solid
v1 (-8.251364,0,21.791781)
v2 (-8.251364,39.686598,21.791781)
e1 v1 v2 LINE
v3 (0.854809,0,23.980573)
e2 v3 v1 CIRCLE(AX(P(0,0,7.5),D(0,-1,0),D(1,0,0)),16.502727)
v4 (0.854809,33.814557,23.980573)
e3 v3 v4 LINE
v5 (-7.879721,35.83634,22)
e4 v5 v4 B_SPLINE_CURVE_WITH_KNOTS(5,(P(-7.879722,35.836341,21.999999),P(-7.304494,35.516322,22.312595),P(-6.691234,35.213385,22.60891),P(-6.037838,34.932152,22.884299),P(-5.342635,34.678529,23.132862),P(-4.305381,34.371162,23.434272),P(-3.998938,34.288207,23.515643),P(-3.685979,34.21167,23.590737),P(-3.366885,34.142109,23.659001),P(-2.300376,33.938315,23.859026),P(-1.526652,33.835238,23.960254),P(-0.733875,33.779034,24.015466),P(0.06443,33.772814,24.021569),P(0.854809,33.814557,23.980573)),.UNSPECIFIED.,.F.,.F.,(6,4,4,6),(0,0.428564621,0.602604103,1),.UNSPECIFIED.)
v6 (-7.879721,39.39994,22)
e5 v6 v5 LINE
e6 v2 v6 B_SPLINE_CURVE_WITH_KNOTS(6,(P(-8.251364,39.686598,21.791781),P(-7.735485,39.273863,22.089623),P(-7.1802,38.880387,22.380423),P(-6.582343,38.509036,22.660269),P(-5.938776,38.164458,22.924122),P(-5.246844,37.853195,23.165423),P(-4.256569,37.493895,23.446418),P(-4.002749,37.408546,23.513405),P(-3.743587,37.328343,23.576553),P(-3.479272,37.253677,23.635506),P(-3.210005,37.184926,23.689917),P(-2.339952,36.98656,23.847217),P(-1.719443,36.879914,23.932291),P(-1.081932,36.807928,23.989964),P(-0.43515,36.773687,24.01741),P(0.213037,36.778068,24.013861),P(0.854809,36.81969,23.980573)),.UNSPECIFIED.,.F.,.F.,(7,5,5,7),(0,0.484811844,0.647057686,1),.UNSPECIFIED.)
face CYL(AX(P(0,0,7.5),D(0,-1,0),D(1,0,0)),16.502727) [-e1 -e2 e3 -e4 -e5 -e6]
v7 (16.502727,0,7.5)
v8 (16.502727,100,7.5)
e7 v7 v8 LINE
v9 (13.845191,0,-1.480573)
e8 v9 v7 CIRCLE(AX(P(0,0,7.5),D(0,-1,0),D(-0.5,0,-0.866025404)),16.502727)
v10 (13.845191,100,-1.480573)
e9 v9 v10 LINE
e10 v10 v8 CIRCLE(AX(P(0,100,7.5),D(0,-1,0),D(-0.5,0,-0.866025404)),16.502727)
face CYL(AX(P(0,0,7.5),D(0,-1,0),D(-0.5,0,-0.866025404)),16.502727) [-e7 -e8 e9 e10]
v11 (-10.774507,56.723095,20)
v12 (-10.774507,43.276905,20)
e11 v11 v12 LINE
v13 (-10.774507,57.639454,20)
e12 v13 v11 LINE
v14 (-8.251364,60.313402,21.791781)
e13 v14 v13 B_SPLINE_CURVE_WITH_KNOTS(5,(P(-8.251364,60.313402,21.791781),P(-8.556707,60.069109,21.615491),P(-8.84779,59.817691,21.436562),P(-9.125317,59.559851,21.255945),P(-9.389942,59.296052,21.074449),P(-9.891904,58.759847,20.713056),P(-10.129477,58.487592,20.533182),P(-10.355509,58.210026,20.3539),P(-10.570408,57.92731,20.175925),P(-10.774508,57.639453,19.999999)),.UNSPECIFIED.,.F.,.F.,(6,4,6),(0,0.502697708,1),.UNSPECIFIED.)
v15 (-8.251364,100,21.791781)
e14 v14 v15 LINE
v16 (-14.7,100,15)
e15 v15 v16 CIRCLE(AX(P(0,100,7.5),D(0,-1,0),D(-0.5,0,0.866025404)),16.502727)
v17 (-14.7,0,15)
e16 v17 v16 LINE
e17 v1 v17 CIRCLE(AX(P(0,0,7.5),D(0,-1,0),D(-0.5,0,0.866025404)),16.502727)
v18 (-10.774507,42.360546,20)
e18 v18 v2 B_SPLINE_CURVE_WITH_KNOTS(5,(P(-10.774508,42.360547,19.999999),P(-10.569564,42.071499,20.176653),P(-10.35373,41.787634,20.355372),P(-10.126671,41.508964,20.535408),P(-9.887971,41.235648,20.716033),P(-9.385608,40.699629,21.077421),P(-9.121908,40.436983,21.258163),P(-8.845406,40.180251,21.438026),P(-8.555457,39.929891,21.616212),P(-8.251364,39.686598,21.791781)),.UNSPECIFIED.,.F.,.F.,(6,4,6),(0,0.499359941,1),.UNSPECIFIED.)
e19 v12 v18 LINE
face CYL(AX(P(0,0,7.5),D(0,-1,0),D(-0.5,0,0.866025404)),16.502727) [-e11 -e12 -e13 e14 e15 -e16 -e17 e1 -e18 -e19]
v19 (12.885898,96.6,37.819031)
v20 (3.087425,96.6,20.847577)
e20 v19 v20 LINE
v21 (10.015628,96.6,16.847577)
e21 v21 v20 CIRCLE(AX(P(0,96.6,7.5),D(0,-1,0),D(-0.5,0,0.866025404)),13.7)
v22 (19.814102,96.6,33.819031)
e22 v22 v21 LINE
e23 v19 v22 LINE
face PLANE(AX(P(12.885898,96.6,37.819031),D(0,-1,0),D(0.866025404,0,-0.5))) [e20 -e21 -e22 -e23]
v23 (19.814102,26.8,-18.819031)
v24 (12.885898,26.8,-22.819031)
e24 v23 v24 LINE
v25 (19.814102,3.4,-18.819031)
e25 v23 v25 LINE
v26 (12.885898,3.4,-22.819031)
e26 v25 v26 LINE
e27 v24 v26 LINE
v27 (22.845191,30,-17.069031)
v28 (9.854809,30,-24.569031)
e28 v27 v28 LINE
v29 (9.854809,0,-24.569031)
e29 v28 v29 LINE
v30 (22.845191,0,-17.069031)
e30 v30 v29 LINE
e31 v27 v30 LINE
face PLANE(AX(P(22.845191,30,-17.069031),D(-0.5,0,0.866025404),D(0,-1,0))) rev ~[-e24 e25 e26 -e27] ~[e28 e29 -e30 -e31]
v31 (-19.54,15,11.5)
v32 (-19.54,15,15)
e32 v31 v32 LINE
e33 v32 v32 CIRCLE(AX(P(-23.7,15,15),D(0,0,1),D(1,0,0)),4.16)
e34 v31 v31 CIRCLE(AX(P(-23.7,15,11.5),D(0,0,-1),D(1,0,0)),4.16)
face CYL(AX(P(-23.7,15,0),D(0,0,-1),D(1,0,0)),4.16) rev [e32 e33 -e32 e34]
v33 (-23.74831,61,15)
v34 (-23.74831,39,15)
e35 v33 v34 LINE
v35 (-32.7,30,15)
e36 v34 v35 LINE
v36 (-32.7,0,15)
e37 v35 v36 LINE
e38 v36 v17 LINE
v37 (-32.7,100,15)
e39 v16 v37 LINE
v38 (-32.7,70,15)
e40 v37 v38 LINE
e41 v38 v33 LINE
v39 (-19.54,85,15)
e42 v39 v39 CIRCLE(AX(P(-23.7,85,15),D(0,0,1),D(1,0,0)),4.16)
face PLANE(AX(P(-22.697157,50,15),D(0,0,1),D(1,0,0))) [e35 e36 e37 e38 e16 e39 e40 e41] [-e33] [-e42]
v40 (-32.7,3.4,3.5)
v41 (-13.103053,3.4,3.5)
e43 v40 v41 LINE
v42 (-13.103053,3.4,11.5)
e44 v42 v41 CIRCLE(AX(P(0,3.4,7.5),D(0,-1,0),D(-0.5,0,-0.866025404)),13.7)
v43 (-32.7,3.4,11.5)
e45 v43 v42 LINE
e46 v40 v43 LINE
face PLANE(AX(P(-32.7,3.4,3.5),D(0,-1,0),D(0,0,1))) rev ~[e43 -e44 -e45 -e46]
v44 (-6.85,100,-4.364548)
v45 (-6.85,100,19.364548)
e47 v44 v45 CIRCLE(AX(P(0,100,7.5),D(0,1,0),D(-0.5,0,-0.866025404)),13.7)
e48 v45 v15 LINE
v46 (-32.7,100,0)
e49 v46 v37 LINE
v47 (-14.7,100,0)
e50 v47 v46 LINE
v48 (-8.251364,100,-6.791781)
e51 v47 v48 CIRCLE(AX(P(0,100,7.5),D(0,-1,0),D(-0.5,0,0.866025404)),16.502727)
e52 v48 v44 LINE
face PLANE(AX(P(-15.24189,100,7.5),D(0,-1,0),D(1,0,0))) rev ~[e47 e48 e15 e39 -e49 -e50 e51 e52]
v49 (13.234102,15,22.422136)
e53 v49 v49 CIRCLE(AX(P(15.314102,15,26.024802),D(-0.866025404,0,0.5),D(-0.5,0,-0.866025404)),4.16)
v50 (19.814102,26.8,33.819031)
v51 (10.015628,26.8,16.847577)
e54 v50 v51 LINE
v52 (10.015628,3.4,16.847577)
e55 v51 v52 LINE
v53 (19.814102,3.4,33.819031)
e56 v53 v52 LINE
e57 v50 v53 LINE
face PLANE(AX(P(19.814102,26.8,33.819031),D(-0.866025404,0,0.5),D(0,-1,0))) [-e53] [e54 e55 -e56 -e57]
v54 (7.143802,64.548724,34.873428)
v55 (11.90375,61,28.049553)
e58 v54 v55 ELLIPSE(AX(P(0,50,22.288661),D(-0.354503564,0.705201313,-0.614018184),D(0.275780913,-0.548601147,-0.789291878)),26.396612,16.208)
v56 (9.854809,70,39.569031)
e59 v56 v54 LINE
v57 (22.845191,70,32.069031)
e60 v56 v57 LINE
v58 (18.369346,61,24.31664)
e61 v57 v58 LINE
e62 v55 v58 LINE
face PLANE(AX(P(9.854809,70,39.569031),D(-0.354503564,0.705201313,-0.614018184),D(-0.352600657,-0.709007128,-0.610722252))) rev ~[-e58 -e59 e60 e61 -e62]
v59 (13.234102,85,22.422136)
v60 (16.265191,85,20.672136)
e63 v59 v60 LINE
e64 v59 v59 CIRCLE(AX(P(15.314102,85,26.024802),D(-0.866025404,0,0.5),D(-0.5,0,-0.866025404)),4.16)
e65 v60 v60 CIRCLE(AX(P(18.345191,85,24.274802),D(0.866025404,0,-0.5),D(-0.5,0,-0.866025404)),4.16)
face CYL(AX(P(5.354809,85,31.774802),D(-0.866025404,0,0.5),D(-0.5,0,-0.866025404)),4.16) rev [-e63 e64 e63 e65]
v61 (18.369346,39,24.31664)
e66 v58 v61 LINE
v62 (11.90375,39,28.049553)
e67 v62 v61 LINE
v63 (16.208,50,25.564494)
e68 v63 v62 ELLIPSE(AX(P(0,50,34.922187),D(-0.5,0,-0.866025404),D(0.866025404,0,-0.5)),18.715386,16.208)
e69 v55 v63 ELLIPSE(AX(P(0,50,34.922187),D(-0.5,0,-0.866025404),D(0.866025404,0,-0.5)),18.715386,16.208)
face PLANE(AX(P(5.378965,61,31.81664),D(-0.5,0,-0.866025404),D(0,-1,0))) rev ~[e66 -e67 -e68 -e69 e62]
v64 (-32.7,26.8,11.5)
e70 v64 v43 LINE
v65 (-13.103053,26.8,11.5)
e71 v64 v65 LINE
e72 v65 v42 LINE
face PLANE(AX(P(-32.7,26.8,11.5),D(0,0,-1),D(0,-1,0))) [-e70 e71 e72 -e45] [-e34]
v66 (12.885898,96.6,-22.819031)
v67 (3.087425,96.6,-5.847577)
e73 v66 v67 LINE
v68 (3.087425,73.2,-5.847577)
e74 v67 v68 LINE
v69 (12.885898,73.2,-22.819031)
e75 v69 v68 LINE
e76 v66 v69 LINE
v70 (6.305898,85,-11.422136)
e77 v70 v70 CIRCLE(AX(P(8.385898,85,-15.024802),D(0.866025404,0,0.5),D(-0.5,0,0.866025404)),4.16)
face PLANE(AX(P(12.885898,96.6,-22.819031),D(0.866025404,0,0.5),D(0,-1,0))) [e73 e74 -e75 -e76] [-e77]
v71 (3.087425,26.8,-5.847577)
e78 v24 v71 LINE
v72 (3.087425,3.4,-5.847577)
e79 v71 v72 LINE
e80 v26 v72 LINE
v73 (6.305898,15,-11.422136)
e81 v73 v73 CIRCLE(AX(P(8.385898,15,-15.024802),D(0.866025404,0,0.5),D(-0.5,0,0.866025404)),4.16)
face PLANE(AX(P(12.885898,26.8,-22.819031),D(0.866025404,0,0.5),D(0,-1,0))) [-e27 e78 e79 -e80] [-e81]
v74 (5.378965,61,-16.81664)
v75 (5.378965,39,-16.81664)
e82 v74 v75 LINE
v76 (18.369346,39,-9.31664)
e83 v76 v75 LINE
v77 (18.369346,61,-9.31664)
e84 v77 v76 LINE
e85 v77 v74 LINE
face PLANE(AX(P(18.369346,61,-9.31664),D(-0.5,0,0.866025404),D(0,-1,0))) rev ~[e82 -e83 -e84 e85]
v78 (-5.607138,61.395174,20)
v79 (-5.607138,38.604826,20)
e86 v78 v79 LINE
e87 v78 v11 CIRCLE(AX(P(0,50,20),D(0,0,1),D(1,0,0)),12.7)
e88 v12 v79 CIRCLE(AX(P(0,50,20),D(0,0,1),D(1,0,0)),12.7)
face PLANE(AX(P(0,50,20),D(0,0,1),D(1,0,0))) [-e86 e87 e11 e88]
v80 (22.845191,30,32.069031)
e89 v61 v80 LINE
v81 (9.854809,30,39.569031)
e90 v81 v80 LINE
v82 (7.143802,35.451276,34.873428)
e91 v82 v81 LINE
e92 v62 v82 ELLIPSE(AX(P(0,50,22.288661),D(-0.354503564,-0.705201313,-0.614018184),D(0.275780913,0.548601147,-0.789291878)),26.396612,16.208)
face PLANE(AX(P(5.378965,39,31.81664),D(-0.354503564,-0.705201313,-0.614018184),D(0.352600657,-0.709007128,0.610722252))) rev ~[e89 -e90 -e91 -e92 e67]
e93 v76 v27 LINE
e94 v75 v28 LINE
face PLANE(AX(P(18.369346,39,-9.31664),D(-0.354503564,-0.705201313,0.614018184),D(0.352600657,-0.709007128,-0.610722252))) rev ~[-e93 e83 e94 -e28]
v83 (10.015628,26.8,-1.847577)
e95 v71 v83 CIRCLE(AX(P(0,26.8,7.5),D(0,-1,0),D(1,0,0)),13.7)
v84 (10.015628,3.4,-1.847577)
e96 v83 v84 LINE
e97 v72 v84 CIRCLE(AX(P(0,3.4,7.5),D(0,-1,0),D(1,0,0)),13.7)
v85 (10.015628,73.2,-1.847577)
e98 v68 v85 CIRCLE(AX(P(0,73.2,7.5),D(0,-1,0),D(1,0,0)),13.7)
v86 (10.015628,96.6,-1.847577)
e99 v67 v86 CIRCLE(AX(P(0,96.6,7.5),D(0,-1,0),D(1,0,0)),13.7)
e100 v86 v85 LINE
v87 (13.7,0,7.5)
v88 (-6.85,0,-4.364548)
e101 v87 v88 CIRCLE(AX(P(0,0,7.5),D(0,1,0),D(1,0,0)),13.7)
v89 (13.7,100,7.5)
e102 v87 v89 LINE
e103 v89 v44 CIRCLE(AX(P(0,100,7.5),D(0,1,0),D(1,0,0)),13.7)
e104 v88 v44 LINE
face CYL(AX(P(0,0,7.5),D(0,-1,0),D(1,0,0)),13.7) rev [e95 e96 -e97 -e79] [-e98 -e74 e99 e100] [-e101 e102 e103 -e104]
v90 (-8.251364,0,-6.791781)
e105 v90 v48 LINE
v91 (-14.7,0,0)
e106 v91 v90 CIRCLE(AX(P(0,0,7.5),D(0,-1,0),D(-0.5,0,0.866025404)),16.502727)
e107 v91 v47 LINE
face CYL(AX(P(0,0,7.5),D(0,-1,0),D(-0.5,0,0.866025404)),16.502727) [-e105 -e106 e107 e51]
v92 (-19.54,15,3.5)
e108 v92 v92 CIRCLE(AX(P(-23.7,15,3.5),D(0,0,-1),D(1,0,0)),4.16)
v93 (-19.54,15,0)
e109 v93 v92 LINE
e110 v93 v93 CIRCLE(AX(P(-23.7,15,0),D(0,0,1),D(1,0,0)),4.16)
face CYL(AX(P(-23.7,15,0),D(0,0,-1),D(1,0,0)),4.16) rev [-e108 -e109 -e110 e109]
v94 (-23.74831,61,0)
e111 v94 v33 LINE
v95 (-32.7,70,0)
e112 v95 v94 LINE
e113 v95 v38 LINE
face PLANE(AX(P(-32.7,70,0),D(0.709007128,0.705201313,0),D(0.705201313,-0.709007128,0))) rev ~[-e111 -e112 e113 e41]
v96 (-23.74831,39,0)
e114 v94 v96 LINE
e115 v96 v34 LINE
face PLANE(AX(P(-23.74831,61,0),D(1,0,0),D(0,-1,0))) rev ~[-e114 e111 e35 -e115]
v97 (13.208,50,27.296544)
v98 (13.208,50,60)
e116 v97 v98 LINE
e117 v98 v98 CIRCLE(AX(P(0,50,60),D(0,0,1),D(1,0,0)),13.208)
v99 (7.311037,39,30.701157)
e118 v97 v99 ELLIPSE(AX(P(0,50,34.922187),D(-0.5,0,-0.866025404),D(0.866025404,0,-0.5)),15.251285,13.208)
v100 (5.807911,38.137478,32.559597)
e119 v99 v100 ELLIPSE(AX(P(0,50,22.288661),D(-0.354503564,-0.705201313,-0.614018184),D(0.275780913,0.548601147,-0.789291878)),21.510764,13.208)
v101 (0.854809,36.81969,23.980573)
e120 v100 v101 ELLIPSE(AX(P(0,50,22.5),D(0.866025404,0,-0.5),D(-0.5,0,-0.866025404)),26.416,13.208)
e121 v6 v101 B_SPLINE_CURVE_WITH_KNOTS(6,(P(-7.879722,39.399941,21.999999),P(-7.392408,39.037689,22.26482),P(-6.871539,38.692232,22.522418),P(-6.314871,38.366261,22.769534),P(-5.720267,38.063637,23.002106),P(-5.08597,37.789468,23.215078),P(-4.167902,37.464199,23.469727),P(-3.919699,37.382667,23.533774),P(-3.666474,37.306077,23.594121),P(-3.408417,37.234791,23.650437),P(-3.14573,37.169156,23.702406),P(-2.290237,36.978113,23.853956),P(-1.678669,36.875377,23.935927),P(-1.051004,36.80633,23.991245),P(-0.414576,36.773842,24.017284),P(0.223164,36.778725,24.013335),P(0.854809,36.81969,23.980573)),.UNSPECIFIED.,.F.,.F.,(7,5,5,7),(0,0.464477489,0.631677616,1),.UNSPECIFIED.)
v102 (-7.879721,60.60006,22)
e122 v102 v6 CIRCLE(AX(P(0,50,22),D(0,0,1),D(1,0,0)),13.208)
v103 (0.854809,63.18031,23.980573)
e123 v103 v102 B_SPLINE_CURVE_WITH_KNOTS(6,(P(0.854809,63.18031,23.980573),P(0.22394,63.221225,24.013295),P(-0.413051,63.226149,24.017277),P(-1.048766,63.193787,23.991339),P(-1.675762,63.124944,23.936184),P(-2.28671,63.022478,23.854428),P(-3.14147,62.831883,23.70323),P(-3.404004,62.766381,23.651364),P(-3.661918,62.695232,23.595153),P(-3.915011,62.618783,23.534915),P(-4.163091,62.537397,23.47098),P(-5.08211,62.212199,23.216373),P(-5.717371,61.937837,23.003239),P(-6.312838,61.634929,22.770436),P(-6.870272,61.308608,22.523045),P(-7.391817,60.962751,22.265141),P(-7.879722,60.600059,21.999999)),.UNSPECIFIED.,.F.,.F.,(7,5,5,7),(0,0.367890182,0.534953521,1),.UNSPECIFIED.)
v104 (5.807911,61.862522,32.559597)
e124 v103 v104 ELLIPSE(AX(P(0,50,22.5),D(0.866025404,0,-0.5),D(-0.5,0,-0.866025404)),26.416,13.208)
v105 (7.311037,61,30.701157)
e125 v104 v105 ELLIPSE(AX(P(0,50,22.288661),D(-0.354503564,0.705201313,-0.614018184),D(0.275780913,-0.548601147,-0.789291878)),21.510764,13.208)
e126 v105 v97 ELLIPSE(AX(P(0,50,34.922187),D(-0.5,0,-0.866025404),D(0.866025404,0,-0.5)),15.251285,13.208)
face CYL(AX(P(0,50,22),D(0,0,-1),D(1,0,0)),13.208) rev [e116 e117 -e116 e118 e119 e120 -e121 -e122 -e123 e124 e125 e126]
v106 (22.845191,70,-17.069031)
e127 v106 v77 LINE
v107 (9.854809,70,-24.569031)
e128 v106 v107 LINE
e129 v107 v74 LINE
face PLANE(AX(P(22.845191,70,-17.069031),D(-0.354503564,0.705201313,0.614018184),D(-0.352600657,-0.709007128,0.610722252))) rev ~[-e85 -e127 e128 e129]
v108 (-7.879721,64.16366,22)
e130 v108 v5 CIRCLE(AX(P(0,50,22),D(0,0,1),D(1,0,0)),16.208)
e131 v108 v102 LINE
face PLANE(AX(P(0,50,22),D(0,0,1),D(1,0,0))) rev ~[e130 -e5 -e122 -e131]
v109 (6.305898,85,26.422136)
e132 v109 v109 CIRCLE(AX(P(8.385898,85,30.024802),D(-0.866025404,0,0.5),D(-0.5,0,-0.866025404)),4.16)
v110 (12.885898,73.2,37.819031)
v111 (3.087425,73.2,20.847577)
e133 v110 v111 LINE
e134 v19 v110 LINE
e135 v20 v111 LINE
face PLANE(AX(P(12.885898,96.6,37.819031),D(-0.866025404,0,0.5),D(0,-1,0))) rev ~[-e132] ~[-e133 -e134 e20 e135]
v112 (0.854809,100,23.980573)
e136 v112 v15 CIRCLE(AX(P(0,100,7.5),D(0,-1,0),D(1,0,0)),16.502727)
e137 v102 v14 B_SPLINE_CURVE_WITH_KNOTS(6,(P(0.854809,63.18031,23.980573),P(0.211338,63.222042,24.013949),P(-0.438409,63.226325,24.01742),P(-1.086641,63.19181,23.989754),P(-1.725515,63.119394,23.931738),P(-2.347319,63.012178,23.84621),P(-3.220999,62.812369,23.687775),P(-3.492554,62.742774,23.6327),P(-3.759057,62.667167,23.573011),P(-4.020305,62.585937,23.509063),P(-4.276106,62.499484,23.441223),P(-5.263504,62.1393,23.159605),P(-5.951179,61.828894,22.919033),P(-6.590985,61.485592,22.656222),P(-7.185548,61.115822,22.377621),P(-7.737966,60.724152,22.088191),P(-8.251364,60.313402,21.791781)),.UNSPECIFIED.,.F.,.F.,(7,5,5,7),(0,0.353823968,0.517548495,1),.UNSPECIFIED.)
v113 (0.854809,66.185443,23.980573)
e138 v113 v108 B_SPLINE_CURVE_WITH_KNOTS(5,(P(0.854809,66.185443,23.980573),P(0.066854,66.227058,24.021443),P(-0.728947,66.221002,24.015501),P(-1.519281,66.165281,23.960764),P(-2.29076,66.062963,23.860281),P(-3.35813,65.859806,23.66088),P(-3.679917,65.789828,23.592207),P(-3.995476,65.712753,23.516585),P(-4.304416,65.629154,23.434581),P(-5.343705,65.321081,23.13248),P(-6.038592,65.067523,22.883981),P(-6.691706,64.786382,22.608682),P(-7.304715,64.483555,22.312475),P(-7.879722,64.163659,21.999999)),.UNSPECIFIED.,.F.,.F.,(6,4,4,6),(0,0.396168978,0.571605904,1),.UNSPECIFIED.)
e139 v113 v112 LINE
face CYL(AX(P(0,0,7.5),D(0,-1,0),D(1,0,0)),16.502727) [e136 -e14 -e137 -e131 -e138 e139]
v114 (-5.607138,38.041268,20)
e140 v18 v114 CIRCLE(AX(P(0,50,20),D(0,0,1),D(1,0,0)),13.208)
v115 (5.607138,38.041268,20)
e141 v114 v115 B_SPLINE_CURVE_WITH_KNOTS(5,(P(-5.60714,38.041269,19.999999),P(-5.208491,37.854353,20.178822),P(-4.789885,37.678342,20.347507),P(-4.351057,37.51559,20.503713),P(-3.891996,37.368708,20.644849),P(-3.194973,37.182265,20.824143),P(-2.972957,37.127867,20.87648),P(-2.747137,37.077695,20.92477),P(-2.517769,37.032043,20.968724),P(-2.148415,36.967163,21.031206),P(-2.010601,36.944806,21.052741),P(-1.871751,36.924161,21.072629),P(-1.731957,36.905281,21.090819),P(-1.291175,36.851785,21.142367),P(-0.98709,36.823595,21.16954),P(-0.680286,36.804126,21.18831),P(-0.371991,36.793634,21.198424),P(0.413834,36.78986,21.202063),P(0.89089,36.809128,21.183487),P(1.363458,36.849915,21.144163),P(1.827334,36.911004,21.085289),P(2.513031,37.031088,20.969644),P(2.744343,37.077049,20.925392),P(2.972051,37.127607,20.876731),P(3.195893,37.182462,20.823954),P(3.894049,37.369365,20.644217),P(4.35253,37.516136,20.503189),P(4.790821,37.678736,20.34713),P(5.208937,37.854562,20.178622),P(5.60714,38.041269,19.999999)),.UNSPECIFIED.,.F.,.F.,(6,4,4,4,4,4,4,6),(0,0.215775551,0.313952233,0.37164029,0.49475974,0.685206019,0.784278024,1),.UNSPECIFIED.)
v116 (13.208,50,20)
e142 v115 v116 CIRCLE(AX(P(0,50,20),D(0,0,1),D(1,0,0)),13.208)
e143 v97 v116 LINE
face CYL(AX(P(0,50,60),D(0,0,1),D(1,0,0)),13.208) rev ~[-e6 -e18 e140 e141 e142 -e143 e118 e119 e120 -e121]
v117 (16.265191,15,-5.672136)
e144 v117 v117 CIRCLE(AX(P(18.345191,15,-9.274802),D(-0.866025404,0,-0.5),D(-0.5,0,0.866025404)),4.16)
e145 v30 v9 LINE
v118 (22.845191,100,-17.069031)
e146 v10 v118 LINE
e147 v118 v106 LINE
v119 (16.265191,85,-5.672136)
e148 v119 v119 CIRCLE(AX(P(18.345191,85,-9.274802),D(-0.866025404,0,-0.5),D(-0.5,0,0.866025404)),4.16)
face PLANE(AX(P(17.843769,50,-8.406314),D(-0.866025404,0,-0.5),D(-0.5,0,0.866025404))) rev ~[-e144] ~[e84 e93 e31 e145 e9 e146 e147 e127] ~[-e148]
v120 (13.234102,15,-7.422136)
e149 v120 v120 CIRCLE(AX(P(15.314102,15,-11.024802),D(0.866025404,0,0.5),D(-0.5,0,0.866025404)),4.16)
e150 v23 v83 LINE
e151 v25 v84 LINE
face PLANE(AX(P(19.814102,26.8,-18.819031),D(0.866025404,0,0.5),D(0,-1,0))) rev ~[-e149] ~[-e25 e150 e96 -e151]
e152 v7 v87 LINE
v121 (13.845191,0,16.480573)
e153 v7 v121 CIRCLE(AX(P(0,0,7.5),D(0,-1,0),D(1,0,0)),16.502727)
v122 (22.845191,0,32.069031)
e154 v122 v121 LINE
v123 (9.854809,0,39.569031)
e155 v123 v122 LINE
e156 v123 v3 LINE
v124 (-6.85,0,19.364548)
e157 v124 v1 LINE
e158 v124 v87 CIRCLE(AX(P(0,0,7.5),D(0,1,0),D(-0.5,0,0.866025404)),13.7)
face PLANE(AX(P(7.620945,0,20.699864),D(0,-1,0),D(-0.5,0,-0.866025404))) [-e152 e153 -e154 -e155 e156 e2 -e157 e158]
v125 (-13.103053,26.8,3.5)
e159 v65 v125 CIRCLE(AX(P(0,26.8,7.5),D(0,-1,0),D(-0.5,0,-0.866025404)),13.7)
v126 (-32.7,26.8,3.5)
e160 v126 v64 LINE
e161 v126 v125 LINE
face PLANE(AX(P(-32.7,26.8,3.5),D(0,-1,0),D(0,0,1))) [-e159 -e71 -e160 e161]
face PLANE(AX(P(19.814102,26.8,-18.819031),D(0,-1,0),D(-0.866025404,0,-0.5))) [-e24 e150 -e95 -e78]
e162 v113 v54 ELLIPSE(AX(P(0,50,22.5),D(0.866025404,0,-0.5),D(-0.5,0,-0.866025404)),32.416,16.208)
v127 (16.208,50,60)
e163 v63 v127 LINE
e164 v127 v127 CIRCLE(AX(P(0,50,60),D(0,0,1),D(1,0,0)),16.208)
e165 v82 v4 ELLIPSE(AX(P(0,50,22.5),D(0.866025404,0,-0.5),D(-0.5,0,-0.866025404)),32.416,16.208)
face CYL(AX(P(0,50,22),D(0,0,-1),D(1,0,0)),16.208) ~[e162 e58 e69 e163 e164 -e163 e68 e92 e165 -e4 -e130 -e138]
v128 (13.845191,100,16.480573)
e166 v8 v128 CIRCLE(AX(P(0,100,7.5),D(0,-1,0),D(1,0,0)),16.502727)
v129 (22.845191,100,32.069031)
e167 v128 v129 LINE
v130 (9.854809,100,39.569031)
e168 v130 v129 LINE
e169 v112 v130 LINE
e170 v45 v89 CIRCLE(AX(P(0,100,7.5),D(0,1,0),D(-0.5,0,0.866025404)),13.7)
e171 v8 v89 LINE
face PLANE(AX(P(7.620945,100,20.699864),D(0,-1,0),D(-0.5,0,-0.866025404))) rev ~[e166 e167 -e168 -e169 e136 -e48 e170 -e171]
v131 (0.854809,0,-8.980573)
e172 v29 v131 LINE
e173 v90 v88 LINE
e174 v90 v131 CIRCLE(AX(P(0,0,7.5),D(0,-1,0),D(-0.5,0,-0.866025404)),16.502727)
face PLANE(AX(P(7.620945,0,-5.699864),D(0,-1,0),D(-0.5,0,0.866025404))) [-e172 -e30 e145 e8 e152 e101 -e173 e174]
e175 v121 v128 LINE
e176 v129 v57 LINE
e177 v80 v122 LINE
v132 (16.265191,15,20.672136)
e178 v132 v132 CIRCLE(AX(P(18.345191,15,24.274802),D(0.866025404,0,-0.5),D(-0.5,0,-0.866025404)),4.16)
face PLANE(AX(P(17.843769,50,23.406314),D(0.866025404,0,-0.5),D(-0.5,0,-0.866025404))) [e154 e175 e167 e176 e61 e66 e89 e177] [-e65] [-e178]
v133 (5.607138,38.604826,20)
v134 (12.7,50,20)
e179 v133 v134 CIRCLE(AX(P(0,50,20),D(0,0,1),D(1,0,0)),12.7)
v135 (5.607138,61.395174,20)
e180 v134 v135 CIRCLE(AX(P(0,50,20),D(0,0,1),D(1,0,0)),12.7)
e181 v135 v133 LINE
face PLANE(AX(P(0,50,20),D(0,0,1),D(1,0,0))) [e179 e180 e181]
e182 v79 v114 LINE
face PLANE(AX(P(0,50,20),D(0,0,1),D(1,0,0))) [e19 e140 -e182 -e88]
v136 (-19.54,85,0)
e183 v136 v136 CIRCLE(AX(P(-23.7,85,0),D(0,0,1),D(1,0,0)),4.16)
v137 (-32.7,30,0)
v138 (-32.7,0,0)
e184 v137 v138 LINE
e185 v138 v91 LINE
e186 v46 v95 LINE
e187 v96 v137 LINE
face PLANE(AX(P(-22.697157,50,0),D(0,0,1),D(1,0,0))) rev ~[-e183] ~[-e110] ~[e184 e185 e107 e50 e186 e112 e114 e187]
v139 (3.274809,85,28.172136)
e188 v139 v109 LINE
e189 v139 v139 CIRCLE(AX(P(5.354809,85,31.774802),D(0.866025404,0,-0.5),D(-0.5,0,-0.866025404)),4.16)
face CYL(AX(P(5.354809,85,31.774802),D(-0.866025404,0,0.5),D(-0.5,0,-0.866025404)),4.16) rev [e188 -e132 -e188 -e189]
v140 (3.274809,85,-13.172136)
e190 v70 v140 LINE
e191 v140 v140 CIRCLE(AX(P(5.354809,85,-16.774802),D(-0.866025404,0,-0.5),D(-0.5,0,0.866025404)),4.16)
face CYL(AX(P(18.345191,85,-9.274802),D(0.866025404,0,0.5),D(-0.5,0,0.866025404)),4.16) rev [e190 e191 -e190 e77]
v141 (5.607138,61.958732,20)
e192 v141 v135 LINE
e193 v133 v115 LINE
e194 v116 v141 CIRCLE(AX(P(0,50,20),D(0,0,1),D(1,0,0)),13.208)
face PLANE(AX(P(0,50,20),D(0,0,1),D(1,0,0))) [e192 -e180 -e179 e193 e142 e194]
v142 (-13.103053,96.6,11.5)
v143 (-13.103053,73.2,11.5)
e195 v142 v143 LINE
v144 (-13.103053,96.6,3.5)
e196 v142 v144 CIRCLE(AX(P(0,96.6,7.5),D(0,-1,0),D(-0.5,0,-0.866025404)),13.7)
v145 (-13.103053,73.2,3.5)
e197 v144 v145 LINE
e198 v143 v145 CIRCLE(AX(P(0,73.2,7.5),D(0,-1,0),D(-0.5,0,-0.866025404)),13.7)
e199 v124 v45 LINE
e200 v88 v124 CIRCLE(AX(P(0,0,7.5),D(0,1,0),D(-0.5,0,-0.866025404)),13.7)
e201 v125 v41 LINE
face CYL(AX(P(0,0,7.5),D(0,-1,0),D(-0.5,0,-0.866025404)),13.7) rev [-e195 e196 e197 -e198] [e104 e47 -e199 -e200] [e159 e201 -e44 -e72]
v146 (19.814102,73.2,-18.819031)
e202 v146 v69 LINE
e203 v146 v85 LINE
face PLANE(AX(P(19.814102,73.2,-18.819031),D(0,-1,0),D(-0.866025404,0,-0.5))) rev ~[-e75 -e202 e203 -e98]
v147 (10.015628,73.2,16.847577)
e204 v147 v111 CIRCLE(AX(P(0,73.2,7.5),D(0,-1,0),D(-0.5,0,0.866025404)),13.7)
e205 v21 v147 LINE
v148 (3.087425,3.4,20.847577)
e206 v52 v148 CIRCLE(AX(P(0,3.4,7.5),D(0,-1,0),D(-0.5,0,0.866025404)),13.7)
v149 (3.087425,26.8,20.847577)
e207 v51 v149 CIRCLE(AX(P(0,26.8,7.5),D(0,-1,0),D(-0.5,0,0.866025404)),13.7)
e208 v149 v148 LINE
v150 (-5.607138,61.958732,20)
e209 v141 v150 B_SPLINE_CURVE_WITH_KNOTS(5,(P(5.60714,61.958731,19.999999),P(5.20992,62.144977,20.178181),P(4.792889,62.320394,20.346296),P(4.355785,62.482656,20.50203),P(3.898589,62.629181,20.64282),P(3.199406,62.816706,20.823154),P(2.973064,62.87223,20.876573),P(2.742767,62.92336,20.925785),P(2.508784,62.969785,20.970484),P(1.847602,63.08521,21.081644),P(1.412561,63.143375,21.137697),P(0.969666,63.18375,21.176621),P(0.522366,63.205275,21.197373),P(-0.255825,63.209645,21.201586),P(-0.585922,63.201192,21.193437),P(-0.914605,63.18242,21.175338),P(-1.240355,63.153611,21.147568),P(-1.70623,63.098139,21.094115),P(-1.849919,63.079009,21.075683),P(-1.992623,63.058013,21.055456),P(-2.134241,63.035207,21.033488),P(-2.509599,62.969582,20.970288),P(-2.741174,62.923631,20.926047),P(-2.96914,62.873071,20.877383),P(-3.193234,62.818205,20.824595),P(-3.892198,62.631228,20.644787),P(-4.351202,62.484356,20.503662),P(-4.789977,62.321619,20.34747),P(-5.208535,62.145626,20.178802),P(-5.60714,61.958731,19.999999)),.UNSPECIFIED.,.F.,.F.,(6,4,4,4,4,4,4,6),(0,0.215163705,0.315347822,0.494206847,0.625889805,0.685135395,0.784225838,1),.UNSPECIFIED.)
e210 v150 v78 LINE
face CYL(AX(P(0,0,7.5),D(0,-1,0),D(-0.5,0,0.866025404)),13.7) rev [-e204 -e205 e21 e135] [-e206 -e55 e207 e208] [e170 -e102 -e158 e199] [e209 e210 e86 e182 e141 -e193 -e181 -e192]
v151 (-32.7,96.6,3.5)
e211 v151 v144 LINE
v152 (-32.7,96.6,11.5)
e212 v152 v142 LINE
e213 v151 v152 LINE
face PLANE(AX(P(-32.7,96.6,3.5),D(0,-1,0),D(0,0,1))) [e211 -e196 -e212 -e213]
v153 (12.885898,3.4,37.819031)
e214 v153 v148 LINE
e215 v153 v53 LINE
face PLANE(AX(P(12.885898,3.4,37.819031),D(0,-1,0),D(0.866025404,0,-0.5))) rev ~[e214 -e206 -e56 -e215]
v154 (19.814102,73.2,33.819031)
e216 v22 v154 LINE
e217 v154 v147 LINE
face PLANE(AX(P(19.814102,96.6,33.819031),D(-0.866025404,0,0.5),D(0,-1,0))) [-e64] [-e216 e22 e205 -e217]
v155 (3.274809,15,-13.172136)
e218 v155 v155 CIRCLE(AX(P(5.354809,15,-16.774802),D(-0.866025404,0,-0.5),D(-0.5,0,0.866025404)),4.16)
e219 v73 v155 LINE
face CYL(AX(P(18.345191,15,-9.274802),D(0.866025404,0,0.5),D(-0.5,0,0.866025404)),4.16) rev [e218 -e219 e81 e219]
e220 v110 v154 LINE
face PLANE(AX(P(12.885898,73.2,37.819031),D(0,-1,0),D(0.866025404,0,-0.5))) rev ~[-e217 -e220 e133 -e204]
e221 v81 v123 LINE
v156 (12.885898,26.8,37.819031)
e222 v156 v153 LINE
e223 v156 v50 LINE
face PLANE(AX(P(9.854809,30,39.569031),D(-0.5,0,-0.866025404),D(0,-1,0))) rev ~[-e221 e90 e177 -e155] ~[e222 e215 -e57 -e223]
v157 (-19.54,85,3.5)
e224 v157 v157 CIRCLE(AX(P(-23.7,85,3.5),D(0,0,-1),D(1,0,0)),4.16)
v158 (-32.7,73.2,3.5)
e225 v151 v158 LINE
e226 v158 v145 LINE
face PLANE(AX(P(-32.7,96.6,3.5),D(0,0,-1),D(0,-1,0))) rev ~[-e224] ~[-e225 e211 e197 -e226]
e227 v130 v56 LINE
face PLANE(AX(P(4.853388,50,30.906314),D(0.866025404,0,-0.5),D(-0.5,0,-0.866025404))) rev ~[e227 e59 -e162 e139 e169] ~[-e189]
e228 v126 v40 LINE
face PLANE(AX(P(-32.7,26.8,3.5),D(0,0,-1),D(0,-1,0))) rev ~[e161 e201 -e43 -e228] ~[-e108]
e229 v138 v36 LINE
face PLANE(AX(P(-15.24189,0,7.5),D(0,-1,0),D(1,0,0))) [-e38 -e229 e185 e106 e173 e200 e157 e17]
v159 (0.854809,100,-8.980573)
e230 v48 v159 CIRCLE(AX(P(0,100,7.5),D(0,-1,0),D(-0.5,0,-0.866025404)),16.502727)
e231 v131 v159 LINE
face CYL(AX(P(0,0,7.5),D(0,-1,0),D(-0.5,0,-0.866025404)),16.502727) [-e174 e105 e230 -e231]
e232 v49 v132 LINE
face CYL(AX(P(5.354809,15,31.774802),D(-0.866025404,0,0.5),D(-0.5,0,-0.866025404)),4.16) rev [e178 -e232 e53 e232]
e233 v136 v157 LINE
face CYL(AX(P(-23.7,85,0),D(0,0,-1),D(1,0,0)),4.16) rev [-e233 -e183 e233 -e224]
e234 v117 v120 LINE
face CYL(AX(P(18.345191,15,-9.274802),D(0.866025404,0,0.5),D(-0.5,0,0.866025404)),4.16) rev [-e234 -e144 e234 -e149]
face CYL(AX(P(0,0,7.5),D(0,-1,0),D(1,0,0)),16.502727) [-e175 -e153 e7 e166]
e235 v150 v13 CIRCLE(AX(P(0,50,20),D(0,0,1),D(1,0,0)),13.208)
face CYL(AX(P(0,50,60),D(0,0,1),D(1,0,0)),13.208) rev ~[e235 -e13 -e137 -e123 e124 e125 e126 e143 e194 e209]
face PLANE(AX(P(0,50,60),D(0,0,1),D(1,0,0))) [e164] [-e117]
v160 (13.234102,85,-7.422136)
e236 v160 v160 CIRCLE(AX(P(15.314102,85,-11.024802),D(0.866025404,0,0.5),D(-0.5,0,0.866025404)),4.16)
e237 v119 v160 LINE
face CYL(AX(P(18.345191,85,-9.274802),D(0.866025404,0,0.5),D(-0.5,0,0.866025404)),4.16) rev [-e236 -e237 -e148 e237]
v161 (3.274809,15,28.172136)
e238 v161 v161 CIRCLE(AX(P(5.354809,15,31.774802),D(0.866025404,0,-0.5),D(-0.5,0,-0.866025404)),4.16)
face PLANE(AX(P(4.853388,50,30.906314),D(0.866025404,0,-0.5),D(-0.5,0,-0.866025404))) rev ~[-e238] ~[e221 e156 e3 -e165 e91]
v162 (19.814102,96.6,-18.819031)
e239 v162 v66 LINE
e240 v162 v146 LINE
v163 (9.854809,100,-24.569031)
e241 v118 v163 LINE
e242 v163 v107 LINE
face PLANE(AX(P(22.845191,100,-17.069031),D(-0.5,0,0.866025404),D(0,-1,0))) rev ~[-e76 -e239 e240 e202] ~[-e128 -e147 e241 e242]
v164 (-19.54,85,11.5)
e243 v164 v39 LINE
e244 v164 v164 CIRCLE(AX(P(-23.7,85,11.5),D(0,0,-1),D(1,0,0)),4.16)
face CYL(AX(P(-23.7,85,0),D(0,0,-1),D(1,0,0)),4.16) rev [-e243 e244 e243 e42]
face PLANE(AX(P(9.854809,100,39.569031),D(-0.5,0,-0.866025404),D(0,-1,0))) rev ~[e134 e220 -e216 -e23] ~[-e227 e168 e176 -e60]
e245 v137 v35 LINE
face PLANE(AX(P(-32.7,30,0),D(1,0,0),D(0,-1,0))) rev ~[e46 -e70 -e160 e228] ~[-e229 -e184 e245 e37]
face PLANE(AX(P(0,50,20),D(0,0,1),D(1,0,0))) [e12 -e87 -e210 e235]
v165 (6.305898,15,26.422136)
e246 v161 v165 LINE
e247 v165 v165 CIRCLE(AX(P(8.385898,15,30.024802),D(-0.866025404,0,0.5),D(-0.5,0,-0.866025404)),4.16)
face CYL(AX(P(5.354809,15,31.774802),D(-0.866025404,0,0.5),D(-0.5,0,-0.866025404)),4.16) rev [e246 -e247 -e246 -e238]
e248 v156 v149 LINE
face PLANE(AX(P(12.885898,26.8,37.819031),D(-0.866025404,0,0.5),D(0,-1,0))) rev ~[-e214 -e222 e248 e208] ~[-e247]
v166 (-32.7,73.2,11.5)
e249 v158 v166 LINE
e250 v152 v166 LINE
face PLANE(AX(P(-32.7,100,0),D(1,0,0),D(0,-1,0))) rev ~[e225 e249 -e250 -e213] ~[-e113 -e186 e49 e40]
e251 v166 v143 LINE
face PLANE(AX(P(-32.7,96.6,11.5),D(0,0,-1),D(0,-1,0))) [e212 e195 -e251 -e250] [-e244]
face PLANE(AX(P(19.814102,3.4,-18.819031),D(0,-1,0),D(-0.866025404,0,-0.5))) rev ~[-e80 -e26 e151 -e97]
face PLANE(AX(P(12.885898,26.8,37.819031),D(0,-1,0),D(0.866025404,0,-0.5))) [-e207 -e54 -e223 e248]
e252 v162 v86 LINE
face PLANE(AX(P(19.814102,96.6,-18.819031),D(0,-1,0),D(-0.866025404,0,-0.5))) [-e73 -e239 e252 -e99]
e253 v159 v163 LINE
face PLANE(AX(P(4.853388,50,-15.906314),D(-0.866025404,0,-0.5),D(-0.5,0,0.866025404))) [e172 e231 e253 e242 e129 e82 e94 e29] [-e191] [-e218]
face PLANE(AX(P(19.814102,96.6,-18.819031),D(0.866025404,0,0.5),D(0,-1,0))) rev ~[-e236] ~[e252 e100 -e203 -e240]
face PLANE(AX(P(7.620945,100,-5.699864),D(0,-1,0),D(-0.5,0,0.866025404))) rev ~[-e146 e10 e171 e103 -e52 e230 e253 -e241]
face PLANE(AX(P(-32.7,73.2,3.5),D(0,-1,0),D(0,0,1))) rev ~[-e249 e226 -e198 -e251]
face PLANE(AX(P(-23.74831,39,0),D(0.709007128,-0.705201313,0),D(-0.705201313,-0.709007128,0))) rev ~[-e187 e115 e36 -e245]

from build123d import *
from build123d import SkipClean  # not in build123d's __all__

# Parameters (mm, degrees)
F0_R      = 4.16
F1_DEPTH  = 15
F3_DEPTH  = 100
F4_W      = 23.4
F4_H      = 8
F5_DEPTH  = 25
F7_COUNT  = 3
F9_START  = 22
F8_R      = 16.208
F8_R_2    = 13.208
F9_DEPTH  = 38
F10_R     = 12.7
F11_DEPTH = 40
F12_R     = 13.208
F13_DEPTH = 40


# Not quite as in the source:
# - a feature names something its author has since deleted; it is built from what else it names


with BuildPart() as f1:
    # F0 (on Top) → F1 (new body)
    with BuildSketch(Plane.XY):
        Polygon((-32.7, 0), (-14.7, 0), (-14.7, 50), (-14.7, 100), (-32.7, 100), (-32.7, 70), (-23.7483102828, 61), (-23.7483102828, 50), (-23.7483102828, 39), (-32.7, 30), align=None)
        with Locations((-23.7, 15)):
            Circle(F0_R, mode=Mode.SUBTRACT)
        with Locations((-23.7, 85)):
            Circle(F0_R, mode=Mode.SUBTRACT)
    extrude(amount=F1_DEPTH)

    # F2 (on face) → F3 (join)
    with BuildSketch(Plane.XZ):
        with BuildLine():
            Line((-14.7, 0), (-14.7, 15))
            ThreePointArc((-14.7, 15), (-16.5027270474, 7.5), (-14.7, 0))
        make_face()
        with BuildLine():
            ThreePointArc((-6.85, -4.3645480318), (-13.7, 7.5), (-6.85, 19.3645480318))
            Line((-6.85, 19.3645480318), (-8.2513635237, 21.7917808547))
            ThreePointArc((-8.2513635237, 21.7917808547), (-11.9675955686, 18.8629510386), (-14.7, 15))
            Line((-14.7, 15), (-14.7, 0))
            ThreePointArc((-14.7, 0), (-11.9675955686, -3.8629510386), (-8.2513635237, -6.7917808547))
            Line((-8.2513635237, -6.7917808547), (-6.85, -4.3645480318))
        make_face()
    extrude(amount=-F3_DEPTH)

    # F4 (on face) → F5 (cut)
    with BuildSketch(Plane(origin=(-32.7, 0, 0), x_dir=(0, -1, 0), z_dir=(-1, 0, 0))):
        with Locations((-84.9, 7.5)):
            Rectangle(F4_W, F4_H)
        with Locations((-15.1, 7.5)):
            Rectangle(F4_W, F4_H)
    extrude(amount=-F5_DEPTH, mode=Mode.SUBTRACT)

    # F7: F1 ×3 about axis
    f7_axis = Axis((0, 0, 7.5), (0, -1, 0))


with BuildPart() as f1_1:
    add(f1.part, clean=False)
    with SkipClean():  # cleaning this boolean's faces spoils the solid; the shape is the same uncleaned
        for i in range(1, F7_COUNT):
            add(f1.part.rotate(f7_axis, i * 360 / F7_COUNT), clean=False)

    # F8 (on Top) → F9 (join)
    with BuildSketch(Plane.XY.offset(F9_START)):
        with Locations((0, 50)):
            Circle(F8_R)
        with Locations((0, 50)):
            Circle(F8_R_2, mode=Mode.SUBTRACT)
    with SkipClean():  # cleaning this boolean's faces spoils the solid; the shape is the same uncleaned
        extrude(amount=F9_DEPTH)

    # F10 (on face) → F11 (cut)
    with BuildSketch(Plane.XY.offset(60)):
        with Locations((0, 50)):
            Circle(F10_R)
    with SkipClean():  # cleaning this boolean's faces spoils the solid; the shape is the same uncleaned
        extrude(amount=-F11_DEPTH, mode=Mode.SUBTRACT)

    # F12 (on face) → F13 (cut)
    with BuildSketch(Plane.XY.offset(60)):
        with Locations((0, 50)):
            Circle(F12_R)
    with SkipClean():  # cleaning this boolean's faces spoils the solid; the shape is the same uncleaned
        extrude(amount=-F13_DEPTH, mode=Mode.SUBTRACT)


solid = f1_1.part
